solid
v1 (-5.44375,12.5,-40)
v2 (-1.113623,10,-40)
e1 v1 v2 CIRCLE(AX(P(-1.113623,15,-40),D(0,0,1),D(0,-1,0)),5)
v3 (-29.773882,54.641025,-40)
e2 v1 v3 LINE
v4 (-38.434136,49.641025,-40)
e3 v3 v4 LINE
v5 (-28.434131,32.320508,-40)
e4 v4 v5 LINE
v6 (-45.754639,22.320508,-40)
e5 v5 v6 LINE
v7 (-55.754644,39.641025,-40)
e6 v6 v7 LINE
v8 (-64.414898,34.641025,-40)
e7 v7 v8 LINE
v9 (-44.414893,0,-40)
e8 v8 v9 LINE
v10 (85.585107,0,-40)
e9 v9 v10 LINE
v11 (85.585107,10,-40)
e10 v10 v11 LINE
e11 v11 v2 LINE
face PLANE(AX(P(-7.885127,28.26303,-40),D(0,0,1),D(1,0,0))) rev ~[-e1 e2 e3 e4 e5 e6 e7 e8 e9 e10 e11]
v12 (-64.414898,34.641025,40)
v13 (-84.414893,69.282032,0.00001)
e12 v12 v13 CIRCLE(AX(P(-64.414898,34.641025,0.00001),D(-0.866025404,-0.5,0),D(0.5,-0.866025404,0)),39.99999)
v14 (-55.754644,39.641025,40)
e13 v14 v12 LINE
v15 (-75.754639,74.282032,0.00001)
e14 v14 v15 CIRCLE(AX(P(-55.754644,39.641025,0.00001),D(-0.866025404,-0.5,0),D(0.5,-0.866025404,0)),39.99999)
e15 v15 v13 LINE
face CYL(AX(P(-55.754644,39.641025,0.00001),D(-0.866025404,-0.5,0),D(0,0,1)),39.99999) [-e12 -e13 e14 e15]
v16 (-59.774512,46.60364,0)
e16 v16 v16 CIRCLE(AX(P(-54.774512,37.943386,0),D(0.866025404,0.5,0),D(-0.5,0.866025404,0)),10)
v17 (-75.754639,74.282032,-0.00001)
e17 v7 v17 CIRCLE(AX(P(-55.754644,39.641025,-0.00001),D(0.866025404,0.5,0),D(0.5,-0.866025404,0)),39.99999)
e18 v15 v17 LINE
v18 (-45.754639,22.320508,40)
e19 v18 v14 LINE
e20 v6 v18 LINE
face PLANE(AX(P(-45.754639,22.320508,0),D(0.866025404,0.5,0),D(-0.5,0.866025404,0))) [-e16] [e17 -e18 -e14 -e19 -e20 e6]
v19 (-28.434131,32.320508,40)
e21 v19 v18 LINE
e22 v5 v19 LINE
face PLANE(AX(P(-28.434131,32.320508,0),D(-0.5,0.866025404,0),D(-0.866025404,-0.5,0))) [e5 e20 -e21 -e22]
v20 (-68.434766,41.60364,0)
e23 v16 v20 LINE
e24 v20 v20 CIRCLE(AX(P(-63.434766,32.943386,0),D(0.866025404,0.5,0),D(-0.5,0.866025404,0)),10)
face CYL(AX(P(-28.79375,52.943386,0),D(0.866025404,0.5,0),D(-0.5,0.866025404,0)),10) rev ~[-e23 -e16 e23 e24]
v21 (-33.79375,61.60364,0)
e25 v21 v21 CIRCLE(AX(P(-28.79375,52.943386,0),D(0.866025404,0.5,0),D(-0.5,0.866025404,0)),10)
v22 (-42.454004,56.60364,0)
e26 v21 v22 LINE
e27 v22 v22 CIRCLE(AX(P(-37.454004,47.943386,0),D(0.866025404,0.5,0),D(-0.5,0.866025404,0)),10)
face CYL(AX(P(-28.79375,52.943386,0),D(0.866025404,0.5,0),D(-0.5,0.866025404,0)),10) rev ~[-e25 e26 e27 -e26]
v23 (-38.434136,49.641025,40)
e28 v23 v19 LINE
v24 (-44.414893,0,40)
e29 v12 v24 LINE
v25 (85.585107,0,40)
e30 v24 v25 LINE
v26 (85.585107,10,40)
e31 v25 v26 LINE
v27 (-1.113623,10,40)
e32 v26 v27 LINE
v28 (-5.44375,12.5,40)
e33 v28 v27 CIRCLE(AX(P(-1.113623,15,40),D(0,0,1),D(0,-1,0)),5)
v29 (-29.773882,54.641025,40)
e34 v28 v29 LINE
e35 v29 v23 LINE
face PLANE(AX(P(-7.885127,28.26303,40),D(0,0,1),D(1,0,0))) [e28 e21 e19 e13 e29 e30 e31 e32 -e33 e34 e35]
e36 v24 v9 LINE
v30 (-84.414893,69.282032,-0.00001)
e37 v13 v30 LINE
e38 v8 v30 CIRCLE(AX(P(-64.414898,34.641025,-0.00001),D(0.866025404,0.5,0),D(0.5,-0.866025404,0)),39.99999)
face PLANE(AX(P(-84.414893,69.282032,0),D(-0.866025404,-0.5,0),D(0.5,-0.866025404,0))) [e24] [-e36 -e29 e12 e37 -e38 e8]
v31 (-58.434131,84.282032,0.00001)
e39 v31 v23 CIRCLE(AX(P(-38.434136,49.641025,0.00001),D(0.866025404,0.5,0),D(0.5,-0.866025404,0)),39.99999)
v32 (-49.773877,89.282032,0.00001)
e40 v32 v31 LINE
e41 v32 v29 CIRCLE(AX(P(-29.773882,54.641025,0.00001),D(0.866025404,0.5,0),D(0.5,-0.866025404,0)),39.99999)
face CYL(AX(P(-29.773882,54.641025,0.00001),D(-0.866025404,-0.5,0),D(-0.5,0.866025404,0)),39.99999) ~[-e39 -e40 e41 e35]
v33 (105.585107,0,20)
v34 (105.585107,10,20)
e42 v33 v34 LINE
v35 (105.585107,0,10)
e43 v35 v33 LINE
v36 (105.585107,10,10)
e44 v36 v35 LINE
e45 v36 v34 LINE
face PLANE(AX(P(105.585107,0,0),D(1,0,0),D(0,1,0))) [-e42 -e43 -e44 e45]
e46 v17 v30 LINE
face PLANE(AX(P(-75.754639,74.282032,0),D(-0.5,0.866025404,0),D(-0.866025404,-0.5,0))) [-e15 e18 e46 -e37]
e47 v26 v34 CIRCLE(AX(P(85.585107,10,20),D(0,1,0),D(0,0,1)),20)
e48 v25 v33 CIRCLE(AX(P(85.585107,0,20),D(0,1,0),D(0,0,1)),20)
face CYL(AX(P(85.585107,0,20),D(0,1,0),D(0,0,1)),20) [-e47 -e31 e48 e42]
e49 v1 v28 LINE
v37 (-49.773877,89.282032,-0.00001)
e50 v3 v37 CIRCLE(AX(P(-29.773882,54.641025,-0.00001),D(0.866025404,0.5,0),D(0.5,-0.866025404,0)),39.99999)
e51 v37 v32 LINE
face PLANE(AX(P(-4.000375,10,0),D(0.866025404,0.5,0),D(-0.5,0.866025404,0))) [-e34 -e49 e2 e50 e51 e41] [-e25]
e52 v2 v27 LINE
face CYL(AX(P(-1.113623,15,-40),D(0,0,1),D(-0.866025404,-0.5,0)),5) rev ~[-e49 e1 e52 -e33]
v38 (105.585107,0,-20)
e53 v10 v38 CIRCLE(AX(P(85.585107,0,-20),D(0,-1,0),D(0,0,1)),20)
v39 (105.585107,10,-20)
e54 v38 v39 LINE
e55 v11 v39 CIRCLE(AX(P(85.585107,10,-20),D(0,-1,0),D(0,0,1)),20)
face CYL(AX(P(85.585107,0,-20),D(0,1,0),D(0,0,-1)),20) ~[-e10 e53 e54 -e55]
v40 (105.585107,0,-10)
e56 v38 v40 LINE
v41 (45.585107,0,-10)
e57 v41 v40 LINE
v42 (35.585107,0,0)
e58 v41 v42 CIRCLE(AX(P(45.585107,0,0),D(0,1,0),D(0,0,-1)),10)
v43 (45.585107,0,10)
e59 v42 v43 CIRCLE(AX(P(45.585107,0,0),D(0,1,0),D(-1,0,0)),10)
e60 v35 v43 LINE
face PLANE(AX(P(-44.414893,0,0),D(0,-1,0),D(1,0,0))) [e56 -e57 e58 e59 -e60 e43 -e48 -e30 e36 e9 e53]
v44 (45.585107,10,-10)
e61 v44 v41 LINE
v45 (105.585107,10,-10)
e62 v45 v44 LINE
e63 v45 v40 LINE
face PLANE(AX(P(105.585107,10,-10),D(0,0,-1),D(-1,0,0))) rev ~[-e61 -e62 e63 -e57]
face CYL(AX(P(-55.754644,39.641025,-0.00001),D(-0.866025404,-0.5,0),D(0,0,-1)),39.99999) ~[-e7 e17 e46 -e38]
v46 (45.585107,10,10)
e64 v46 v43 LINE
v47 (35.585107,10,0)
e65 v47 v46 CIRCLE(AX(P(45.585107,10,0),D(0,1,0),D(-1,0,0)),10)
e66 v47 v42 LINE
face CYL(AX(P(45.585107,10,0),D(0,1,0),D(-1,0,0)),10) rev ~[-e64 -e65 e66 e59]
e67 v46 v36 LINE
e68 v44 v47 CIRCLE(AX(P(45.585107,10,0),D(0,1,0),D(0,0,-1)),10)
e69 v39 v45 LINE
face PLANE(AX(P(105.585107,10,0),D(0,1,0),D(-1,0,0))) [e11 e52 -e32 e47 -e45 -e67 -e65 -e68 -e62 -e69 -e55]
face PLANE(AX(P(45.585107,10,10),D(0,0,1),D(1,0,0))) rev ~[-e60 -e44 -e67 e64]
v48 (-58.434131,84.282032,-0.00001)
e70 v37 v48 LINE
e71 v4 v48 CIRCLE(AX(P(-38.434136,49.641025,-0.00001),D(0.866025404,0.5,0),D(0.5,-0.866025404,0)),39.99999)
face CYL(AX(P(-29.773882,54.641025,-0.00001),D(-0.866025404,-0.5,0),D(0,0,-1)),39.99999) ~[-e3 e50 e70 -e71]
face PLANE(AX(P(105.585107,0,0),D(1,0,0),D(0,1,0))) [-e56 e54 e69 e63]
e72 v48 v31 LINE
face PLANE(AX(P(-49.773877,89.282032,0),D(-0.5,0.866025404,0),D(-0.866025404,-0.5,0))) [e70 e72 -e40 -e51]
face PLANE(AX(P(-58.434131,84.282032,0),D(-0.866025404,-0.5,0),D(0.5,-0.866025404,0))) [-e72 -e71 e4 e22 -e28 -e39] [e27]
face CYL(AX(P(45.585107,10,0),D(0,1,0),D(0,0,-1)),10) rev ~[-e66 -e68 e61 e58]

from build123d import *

# Parameters (mm, degrees)
F1_DEPTH      = 40
F1_DEPTH_BACK = 40
F2_R          = 5
F3_R          = 39.99999
F4_R          = 10
F5_DEPTH      = 52.2
F7_DEPTH      = 25
F8_R          = 20


# Not quite as in the source:
# - a fillet or chamfer is up to 0.001 mm smaller than in the source, because OpenCascade refuses the exact size


with BuildPart() as f1:
    # F0 (on Top) → F1 (new body, two sides)
    with BuildSketch(Plane.XY) as f1_sk:
        Polygon((-44.4148934171, 0), (105.5851065829, 0), (105.5851065829, 10), (-4.0003745738, 10), (-49.7738772657, 89.2820323028), (-58.4341313035, 84.2820323028), (-28.4341313035, 32.3205080757), (-45.7546393792, 22.3205080757), (-75.7546393792, 74.2820323028), (-84.4148934171, 69.2820323028), align=None)
    extrude(amount=F1_DEPTH)
    extrude(f1_sk.sketch, amount=-F1_DEPTH_BACK)

    # F2
    f2_edges = [f1.edges().sort_by_distance(p)[0] for p in [
        (-4.000375, 10, 0),
    ]]
    fillet(f2_edges, radius=F2_R)

    # F3 (radius 40 in the source; OpenCascade refuses exactly that, so slightly less here)
    f3_edges = [f1.edges().sort_by_distance(p)[0] for p in [
        (-54.104004, 86.782032, 40),
        (-80.084766, 71.782032, 40),
        (-80.084766, 71.782032, -40),
        (-54.104004, 86.782032, -40),
    ]]
    fillet(f3_edges, radius=F3_R)

    # F4 (on face) → F5 (cut)
    with BuildSketch(Plane(origin=(1.3298460886, 0.7677869972, 0), x_dir=(-0.5, 0.8660254038, 0), z_dir=(0.8660254038, 0.5, 0))):
        with Locations((60.2471926707, 0)):
            Circle(F4_R)
    extrude(amount=-F5_DEPTH, mode=Mode.SUBTRACT)

    # F6 (on face) → F7 (cut)
    with BuildSketch(Plane(origin=(0, 10, 0), x_dir=(-1, 0, 0), z_dir=(0, 1, 0))):
        with BuildLine():
            ThreePointArc((-45.5851065829, -10), (-55.5851065829, 0), (-45.5851065829, 10))
            Line((-45.5851065829, 10), (-105.5851065829, 10))
            Line((-105.5851065829, 10), (-105.5851065829, -10))
            Line((-105.5851065829, -10), (-45.5851065829, -10))
        make_face()
        with BuildLine():
            ThreePointArc((-45.5851065829, -10), (-38.5140387711, -7.0710678119), (-35.5851065829, 0))
            ThreePointArc((-35.5851065829, 0), (-38.5140387711, 7.0710678119), (-45.5851065829, 10))
            ThreePointArc((-45.5851065829, 10), (-55.5851065829, 0), (-45.5851065829, -10))
        make_face()
    extrude(amount=-F7_DEPTH, mode=Mode.SUBTRACT)

    # F8
    f8_edges = [f1.edges().sort_by_distance(p)[0] for p in [
        (105.585107, 5, -40),
        (105.585107, 5, 40),
    ]]
    fillet(f8_edges, radius=F8_R)


solid = f1.part
